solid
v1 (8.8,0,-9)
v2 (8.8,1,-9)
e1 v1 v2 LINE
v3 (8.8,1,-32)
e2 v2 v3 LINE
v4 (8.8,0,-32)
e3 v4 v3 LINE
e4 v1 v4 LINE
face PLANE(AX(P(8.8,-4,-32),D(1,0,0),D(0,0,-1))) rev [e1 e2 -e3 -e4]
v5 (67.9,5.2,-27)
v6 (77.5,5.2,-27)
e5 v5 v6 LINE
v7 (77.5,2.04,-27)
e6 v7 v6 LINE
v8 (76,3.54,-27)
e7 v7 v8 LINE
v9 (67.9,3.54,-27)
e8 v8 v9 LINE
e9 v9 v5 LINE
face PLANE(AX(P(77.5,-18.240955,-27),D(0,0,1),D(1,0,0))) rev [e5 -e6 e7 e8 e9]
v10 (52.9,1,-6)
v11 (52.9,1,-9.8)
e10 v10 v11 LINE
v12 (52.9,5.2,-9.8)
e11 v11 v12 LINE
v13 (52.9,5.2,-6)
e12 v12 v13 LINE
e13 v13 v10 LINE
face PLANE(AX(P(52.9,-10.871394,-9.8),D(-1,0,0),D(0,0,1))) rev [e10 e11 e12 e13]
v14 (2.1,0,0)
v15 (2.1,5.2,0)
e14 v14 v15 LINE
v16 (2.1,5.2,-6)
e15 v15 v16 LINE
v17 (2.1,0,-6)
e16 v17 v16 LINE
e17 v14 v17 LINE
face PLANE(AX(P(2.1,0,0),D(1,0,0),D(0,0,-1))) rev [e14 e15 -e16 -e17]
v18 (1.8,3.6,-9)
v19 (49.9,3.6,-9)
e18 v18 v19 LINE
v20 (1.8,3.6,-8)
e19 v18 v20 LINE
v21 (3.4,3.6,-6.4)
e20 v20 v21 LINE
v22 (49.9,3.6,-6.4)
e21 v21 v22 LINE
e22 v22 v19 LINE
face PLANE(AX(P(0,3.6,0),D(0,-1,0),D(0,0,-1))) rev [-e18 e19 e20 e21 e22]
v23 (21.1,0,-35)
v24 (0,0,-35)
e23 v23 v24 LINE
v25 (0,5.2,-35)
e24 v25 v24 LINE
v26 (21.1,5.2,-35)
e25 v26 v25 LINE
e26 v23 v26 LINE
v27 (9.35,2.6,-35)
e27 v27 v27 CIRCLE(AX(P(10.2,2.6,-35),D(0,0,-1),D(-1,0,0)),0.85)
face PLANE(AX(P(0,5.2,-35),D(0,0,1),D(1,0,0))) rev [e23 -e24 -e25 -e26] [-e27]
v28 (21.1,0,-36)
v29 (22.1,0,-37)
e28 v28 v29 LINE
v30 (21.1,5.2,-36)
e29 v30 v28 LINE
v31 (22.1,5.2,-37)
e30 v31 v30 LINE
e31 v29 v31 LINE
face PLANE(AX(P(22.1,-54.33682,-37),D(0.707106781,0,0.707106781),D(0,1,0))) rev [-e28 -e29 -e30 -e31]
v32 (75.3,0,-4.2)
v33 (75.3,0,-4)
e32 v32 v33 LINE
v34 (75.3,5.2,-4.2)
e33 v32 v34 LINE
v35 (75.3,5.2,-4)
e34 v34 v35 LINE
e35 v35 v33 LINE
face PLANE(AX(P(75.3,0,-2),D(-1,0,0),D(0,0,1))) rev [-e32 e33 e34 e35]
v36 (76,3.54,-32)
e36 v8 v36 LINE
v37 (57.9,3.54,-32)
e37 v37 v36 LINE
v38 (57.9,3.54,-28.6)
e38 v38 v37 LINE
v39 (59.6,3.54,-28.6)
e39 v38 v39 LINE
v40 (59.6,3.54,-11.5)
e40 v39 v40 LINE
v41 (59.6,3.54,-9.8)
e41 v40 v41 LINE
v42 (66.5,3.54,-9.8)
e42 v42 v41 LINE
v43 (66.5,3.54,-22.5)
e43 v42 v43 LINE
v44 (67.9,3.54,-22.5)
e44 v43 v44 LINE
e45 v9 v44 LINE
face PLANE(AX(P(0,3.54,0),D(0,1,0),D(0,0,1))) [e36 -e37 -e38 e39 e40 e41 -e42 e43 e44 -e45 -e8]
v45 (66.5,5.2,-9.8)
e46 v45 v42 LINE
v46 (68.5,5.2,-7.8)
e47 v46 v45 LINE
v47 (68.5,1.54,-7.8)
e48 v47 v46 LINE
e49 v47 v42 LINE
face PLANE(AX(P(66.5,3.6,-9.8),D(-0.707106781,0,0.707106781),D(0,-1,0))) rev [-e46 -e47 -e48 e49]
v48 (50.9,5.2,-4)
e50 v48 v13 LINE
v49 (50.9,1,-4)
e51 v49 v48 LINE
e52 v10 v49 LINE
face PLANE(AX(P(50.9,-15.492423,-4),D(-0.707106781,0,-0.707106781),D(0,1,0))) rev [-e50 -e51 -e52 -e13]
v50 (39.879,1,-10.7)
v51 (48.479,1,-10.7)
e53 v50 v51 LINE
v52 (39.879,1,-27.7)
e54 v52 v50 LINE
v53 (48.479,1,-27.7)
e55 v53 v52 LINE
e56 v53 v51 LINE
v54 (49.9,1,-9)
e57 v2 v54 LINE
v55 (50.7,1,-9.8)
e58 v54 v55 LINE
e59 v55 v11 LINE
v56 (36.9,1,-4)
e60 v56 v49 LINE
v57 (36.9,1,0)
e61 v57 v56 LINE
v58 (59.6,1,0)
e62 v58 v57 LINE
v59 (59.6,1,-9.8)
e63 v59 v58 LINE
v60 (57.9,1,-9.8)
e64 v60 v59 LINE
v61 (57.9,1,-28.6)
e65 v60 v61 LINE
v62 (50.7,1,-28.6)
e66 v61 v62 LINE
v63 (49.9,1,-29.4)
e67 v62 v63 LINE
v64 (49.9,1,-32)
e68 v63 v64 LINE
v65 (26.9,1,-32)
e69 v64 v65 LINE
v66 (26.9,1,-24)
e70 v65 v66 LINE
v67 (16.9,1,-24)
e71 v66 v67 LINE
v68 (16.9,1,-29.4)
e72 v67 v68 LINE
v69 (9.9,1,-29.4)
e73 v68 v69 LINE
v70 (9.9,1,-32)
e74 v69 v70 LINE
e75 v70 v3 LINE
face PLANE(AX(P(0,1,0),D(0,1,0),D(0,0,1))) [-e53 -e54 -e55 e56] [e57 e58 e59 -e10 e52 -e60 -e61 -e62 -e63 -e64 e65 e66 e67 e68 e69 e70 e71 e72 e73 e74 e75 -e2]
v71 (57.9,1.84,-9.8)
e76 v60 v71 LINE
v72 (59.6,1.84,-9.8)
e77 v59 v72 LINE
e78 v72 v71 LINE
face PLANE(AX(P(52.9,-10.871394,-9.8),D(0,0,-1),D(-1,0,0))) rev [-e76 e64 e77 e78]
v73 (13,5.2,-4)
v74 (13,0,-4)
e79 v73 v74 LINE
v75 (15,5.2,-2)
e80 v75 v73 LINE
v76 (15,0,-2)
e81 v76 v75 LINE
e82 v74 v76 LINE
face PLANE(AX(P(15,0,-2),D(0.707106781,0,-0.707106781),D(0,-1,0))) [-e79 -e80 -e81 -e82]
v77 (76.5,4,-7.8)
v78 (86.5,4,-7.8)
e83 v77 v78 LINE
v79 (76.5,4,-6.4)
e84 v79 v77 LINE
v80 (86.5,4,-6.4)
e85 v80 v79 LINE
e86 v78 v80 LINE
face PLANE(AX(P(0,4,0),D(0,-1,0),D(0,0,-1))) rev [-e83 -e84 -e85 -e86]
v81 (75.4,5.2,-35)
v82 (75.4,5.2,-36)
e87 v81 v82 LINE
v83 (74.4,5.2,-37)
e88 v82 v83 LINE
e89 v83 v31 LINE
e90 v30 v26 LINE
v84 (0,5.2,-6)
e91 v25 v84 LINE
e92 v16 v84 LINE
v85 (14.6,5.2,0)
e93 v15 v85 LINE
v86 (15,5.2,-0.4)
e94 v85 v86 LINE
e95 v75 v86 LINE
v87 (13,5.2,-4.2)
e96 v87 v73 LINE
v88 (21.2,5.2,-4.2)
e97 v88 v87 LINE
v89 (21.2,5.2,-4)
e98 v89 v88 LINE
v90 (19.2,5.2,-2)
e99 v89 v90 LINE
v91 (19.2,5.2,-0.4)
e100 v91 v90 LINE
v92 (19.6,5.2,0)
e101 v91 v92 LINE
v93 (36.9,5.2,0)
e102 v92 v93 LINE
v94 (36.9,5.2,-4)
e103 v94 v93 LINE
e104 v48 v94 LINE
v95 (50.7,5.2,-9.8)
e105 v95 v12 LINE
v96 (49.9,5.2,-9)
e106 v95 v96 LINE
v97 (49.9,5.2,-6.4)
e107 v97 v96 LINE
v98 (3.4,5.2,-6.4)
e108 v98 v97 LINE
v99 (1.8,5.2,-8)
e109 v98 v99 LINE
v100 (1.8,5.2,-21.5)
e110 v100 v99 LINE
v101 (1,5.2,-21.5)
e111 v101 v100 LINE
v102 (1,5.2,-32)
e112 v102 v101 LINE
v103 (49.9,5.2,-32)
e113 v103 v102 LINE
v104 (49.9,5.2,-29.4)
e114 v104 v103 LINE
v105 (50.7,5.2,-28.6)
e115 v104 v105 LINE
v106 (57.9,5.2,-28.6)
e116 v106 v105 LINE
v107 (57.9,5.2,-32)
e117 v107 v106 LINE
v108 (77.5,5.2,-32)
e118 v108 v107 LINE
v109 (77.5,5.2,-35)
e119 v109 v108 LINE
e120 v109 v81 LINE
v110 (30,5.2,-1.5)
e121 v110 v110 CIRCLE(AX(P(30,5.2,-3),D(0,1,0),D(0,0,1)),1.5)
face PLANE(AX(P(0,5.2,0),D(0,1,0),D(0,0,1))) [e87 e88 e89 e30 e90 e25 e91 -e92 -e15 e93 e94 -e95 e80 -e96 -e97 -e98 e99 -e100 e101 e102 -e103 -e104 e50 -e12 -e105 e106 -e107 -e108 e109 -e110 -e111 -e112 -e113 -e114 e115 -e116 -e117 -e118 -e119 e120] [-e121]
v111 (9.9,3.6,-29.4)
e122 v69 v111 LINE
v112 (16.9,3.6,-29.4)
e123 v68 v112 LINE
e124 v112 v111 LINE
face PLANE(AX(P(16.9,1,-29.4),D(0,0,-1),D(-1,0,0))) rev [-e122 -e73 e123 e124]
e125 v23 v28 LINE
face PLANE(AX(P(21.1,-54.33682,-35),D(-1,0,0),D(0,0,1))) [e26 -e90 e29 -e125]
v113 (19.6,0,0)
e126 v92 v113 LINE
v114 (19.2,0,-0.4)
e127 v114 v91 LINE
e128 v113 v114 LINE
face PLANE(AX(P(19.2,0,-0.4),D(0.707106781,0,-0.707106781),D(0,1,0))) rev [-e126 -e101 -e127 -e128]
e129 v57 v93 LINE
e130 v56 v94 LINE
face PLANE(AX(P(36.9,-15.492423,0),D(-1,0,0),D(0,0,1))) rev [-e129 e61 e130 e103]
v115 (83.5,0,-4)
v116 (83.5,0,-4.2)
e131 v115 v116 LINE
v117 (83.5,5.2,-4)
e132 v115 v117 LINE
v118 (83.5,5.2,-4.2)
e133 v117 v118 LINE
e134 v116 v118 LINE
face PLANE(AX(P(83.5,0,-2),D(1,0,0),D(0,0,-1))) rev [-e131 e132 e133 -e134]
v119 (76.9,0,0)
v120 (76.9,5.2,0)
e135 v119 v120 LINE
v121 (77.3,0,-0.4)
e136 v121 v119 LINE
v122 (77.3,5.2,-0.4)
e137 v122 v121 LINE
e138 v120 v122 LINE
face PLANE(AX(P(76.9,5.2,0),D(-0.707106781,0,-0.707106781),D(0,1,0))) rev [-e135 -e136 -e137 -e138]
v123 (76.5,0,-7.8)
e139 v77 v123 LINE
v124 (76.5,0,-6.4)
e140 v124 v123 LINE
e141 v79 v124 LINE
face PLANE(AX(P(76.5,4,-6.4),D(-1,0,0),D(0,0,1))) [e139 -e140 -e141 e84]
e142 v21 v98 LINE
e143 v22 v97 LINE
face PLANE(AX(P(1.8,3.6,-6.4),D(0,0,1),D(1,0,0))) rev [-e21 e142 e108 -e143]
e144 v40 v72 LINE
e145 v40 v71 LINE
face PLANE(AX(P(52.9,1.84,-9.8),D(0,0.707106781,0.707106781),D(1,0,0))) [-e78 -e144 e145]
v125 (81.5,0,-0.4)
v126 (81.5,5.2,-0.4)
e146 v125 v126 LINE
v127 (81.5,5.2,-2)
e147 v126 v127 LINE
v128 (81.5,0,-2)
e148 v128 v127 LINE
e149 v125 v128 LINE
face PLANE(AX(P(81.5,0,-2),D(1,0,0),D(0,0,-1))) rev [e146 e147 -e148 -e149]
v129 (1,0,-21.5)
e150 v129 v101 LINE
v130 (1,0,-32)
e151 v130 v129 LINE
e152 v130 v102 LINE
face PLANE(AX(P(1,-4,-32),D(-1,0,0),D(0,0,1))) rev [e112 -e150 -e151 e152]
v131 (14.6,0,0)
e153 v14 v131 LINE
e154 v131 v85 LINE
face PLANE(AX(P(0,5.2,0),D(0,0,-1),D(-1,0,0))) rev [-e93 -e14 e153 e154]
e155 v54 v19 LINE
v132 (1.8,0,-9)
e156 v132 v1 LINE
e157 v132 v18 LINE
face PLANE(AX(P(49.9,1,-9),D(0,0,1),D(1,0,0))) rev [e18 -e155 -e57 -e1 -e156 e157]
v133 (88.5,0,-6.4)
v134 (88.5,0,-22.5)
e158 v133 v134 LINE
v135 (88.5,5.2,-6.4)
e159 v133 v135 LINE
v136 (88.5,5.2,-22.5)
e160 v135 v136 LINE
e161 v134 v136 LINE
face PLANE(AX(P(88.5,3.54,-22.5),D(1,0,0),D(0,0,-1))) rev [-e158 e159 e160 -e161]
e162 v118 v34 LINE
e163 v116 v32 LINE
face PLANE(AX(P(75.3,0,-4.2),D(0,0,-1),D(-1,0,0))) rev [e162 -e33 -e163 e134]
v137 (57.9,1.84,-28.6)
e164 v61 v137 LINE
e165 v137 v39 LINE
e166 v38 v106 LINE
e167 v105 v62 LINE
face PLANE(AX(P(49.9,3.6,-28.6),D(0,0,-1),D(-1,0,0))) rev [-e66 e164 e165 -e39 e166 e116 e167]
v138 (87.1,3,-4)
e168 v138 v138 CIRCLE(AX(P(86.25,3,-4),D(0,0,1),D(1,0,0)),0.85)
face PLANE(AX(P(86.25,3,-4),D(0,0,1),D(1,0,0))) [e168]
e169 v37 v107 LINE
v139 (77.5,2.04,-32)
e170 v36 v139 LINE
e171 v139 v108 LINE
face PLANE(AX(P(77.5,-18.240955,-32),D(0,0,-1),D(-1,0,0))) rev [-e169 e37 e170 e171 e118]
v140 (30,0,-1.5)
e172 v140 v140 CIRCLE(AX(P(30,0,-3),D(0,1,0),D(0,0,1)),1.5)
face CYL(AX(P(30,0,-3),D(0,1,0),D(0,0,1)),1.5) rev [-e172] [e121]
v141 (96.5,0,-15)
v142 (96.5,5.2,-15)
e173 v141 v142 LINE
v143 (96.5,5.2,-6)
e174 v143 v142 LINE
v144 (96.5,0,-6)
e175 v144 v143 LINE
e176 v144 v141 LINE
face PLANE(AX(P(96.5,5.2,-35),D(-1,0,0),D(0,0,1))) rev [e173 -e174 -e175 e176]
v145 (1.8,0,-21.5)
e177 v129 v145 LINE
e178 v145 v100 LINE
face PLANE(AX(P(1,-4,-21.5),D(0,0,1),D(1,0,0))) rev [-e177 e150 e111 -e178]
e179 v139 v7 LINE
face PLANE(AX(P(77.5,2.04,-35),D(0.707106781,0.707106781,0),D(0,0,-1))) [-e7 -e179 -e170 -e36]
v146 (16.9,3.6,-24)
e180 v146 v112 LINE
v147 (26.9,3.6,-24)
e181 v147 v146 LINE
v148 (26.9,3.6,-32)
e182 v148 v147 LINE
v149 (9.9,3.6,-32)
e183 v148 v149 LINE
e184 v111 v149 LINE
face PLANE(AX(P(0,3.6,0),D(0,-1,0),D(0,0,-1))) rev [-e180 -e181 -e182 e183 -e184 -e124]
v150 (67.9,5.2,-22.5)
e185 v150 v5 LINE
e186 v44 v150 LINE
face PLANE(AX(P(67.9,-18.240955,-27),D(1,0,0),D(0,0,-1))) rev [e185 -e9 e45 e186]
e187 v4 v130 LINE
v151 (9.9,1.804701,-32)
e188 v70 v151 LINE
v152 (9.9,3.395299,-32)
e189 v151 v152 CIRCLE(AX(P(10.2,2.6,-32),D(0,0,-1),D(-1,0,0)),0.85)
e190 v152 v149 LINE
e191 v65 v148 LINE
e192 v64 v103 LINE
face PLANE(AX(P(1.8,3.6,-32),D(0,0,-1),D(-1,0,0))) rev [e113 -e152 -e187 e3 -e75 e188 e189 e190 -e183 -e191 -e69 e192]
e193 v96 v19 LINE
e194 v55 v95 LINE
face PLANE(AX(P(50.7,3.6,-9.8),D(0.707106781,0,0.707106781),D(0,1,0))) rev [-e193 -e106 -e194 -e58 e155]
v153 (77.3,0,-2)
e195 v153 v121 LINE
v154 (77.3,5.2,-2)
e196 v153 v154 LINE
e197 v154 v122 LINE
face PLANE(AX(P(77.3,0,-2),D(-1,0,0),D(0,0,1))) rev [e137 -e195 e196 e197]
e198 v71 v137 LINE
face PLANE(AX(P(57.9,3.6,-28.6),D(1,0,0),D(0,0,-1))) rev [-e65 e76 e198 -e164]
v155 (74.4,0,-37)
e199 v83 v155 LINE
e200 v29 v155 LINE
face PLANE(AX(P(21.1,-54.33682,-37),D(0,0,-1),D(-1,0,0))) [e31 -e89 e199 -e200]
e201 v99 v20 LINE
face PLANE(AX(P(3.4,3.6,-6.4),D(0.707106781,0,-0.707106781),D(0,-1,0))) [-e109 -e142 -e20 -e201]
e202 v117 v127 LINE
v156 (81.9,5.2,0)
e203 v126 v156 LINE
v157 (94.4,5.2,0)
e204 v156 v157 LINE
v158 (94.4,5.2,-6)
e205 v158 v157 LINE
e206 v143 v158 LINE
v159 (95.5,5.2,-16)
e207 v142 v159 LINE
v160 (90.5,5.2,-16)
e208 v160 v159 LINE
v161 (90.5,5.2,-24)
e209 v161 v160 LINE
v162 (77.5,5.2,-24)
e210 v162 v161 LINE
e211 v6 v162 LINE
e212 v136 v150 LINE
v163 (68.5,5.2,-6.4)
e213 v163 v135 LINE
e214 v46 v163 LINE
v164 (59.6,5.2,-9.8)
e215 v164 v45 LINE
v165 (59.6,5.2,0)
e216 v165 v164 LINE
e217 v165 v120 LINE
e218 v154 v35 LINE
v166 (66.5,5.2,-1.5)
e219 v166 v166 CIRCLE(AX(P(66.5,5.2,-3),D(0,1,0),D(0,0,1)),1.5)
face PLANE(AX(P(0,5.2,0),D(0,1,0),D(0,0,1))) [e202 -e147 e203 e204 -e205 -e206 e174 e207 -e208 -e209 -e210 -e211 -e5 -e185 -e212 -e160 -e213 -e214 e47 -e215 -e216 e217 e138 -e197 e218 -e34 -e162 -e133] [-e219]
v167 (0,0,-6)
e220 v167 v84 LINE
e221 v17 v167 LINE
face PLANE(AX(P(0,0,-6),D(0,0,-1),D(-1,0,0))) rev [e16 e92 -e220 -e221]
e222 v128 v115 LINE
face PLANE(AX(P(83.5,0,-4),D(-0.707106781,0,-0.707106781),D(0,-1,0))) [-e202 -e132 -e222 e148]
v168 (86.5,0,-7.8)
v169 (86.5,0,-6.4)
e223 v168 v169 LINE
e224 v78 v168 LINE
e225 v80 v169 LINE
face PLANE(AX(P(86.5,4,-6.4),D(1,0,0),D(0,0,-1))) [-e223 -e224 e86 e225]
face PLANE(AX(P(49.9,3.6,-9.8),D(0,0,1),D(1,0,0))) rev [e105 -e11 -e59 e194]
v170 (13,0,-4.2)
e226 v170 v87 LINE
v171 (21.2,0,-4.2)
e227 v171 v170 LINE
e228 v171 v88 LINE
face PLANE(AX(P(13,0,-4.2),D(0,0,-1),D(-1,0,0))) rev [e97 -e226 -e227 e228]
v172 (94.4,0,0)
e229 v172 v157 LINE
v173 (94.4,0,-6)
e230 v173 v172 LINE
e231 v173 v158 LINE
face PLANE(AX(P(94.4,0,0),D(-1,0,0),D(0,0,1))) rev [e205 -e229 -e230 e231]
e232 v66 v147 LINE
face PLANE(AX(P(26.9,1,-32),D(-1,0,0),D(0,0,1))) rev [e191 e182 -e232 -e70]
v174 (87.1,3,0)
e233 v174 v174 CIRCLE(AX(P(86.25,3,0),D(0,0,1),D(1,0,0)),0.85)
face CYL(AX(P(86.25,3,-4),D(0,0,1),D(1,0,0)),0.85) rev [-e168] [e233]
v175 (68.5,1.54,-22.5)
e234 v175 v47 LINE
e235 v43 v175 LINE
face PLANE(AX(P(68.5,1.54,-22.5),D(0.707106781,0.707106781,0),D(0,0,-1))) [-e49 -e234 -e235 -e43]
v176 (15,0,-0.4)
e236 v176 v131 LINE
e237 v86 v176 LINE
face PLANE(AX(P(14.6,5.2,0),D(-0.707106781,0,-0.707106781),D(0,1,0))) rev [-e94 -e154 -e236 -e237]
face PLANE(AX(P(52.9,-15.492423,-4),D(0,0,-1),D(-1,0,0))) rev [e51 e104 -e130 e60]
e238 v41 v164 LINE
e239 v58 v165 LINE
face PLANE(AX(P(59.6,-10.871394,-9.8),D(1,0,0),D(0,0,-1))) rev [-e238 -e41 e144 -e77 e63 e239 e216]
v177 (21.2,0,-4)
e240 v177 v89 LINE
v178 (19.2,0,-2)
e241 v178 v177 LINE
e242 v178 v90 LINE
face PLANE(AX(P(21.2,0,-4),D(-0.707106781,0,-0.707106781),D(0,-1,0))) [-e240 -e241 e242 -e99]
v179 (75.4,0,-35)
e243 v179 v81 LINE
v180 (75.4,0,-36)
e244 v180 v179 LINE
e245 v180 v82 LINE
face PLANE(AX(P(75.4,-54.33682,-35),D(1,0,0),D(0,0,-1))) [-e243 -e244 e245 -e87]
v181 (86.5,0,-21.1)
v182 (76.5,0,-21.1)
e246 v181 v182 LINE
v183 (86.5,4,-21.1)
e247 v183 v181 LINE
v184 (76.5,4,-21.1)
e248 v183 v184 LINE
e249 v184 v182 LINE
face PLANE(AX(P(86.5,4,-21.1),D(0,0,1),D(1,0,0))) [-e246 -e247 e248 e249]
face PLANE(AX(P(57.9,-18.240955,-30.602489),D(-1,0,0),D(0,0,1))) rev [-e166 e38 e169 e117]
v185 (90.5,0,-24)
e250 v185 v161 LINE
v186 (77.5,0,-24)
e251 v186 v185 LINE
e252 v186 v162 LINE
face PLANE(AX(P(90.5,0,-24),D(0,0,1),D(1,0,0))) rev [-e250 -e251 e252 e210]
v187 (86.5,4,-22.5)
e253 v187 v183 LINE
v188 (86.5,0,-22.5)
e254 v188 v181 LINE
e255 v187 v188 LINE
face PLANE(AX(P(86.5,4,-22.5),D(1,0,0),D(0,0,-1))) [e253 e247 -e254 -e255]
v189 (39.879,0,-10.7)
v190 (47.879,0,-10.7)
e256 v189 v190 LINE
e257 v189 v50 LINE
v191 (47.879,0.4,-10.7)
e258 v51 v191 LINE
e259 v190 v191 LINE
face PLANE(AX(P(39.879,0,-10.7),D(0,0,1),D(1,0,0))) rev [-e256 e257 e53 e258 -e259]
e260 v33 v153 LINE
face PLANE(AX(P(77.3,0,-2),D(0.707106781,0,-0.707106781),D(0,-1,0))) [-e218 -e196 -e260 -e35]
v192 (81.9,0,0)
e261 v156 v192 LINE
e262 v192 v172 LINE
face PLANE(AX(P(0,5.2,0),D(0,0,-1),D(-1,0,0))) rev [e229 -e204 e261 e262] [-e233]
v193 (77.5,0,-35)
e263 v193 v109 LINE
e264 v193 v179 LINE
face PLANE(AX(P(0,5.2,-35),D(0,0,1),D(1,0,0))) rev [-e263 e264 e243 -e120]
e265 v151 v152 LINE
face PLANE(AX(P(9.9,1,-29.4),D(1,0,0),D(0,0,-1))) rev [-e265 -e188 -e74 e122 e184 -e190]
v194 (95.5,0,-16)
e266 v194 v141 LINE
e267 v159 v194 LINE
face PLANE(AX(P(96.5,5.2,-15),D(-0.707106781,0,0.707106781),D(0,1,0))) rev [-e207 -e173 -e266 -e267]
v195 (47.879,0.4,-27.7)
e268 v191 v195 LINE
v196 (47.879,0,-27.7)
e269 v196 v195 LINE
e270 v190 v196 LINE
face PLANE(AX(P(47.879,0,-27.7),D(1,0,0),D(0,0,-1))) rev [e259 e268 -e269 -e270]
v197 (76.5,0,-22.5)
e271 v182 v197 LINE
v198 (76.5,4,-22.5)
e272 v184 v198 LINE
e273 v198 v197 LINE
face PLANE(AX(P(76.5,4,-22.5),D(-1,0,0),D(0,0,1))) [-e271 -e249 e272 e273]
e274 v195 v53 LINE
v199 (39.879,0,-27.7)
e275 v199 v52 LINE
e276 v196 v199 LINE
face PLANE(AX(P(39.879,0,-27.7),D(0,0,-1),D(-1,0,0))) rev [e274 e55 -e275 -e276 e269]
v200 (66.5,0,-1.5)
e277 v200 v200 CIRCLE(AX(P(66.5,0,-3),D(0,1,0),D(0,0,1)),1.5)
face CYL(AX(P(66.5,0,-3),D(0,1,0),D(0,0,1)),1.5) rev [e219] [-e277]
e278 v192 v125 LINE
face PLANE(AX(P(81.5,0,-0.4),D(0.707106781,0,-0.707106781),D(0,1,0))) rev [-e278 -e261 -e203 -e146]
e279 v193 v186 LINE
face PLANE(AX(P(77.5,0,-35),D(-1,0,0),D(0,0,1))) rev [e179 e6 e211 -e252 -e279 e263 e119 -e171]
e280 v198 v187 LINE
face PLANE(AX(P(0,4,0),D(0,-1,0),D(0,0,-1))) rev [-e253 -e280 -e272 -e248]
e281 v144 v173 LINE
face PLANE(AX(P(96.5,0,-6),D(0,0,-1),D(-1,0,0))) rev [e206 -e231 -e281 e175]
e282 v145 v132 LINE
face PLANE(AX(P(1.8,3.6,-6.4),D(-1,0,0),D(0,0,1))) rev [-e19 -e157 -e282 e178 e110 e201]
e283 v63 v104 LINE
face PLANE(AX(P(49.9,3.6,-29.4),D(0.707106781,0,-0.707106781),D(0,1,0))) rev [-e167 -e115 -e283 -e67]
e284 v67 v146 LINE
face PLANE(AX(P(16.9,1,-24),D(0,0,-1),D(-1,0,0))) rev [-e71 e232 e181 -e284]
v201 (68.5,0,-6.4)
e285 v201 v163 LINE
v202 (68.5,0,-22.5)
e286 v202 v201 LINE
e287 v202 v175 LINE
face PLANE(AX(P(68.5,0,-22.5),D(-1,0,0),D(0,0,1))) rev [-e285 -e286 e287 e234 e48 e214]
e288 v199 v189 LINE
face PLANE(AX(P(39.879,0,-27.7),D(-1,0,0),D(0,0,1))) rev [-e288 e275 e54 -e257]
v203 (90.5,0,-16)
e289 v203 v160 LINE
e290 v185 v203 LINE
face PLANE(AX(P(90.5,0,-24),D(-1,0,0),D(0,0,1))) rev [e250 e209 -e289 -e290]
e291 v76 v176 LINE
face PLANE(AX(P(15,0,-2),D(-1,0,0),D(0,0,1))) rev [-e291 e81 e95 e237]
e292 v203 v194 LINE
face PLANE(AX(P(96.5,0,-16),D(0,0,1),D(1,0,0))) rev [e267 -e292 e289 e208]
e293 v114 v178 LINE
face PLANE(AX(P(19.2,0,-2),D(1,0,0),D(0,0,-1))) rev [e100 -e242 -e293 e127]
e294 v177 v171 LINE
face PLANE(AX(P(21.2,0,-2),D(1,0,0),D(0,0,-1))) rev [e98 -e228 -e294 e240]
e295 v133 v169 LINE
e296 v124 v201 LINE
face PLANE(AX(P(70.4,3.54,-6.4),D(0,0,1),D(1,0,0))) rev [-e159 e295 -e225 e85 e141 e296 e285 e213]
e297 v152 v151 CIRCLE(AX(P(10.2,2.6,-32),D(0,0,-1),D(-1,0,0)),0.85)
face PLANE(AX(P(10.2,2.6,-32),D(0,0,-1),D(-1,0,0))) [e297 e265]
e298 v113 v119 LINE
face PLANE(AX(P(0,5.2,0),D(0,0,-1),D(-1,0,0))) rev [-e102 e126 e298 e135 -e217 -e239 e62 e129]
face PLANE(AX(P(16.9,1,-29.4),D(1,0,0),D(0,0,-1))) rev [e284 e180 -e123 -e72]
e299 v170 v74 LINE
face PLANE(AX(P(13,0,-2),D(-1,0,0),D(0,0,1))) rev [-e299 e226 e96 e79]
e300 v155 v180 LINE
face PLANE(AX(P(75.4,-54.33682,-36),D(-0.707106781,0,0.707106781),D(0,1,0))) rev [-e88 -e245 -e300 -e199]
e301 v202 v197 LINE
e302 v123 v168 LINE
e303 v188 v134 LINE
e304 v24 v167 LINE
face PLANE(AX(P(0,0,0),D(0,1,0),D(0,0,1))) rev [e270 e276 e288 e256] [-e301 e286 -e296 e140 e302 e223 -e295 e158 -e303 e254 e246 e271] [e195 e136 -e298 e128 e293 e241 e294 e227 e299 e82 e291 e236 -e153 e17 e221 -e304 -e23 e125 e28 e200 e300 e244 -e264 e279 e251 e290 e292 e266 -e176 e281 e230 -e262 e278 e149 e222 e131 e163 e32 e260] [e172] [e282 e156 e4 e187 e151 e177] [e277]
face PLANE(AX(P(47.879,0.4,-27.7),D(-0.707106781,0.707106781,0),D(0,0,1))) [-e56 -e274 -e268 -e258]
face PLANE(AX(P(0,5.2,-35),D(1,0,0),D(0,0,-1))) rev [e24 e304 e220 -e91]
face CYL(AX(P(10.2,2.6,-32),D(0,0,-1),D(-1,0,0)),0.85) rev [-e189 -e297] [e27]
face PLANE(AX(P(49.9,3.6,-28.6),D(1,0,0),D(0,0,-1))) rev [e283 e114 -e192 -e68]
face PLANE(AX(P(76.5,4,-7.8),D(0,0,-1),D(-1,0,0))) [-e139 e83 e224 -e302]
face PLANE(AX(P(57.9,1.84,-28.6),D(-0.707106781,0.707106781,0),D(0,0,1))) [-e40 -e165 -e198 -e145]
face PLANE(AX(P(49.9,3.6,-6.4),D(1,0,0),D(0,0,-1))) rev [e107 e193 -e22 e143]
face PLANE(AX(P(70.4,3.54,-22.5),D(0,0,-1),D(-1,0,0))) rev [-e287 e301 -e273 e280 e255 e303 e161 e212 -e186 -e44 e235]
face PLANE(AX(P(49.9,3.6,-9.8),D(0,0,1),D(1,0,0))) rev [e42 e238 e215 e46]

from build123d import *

# Parameters (mm, degrees)
SKETCH_1_W           = 96.5
SKETCH_1_H           = 35
EXTRUDE_1_DEPTH      = 5.2
CUT_EXTRUDE_6_DEPTH  = 1.6
CUT_EXTRUDE_7_DEPTH  = 2.6
CUT_EXTRUDE_15_DEPTH = 5
SKETCH_7_W           = 8
SKETCH_7_H           = 17
CUT_EXTRUDE_16_DEPTH = 103.736994311
SKETCH_8_W           = 18.1
SKETCH_8_H           = 16.1
CUT_EXTRUDE_17_DEPTH = 1.66
CUT_EXTRUDE_18_REACH = 104.712
SKETCH_9_W           = 15.2
SKETCH_9_H           = 16.1
CHAMFER_1_SIZE       = 0.6
SKETCH_10_W          = 12.5
SKETCH_10_H          = 12.7
CUT_EXTRUDE_19_DEPTH = 1.66
CHAMFER_2_SIZE       = 0.8
CUT_EXTRUDE_20_DEPTH = 103.782732013
CHAMFER_4_SIZE       = 1
SKETCH_14_W          = 54.3
SKETCH_14_H          = 2
EXTRUDE_2_DEPTH      = 5.2
CHAMFER_5_SIZE       = 1
CUT_EXTRUDE_21_DEPTH = 1.66
CHAMFER_3_SIZE       = 1.5
CHAMFER_6_SIZE       = 1.6
SKETCH_16_W          = 2.1
SKETCH_16_H          = 6
CUT_EXTRUDE_22_DEPTH = 104.480867797
CUT_EXTRUDE_24_DEPTH = 104.480867797
CHAMFER_11_SIZE      = 2
CHAMFER_10_SIZE      = 0.4
CUT_EXTRUDE_START    = -4.2
SKETCH_21_W          = 6.7
SKETCH_21_H          = 9.8
CUT_EXTRUDE_26_DEPTH = 4.2
CHAMFER_9_SIZE       = 1.7
SKETCH_22_W          = 16
SKETCH_22_H          = 4
CUT_EXTRUDE_27_DEPTH = 4.2
CHAMFER_12_SIZE      = 2
SKETCH_24_R          = 1.5
CUT_EXTRUDE_28_DEPTH = 104.480867797
SKETCH_25_R          = 0.85
CUT_EXTRUDE_29_DEPTH = 3
SKETCH_26_R          = 0.85
CUT_EXTRUDE_30_DEPTH = 4
SKETCH_27_W          = 20
SKETCH_27_H          = 16.1
CUT_EXTRUDE_31_DEPTH = 104.480867797
SKETCH_28_W          = 10
SKETCH_28_H          = 1.4
EXTRUDE_3_DEPTH      = 4
CHAMFER_13_SIZE      = 2
CHAMFER_14_SIZE      = 2


# Some blends are built 0.0001 mm under size
with BuildPart() as part:
    # 草图1 → 凸台-拉伸1 (new body)
    with BuildSketch(Plane(origin=(0, 0, 0), x_dir=(1, 0, 0), z_dir=(0, 1, 0))):
        with Locations((48.25, 17.5)):
            Rectangle(SKETCH_1_W, SKETCH_1_H)
    extrude(amount=EXTRUDE_1_DEPTH)

    # 草图4 → 切除-拉伸6 (cut)
    with BuildSketch(Plane(origin=(0, 5.2, 0), x_dir=(1, 0, 0), z_dir=(0, 1, 0))):
        Polygon((1.8, 6.4), (49.9, 6.4), (49.9, 9.8), (57.9, 9.8), (57.9, 28.6), (49.9, 28.6), (49.9, 32), (1.8, 32), align=None)
    extrude(amount=-CUT_EXTRUDE_6_DEPTH, mode=Mode.SUBTRACT)

    # 草图5 → 切除-拉伸7 (cut)
    with BuildSketch(Plane(origin=(0, 3.6, 0), x_dir=(1, 0, 0), z_dir=(0, 1, 0))):
        Polygon((49.9, 9), (1.8, 9), (1.8, 32), (9.9, 32), (9.9, 29.4), (16.9, 29.4), (16.9, 24), (26.9, 24), (26.9, 32), (49.9, 32), (49.9, 28.6), (57.9, 28.6), (57.9, 9.8), (49.9, 9.8), align=None)
    extrude(amount=-CUT_EXTRUDE_7_DEPTH, mode=Mode.SUBTRACT)

    # 草图6 → 切除-拉伸15 (cut, symmetric)
    with BuildSketch(Plane(origin=(0, 1, 0), x_dir=(1, 0, 0), z_dir=(0, 1, 0))):
        Polygon((3.8, 32), (8.8, 32), (8.8, 9), (1.8, 9), (1.8, 21.5), (1, 21.5), (1, 32), align=None)
    extrude(amount=CUT_EXTRUDE_15_DEPTH, both=True, mode=Mode.SUBTRACT)

    # 草图7 → 切除-拉伸16 (cut, through all)
    with BuildSketch(Plane(origin=(0, 1, 0), x_dir=(1, 0, 0), z_dir=(0, 1, 0))):
        with Locations((43.879, 19.2)):
            Rectangle(SKETCH_7_W, SKETCH_7_H)
    extrude(amount=-CUT_EXTRUDE_16_DEPTH, mode=Mode.SUBTRACT)

    # 草图8 → 切除-拉伸17 (cut)
    with BuildSketch(Plane(origin=(0, 5.2, 0), x_dir=(1, 0, 0), z_dir=(0, 1, 0))):
        with Locations((79.45, 14.45)):
            Rectangle(SKETCH_8_W, SKETCH_8_H)
    extrude(amount=-CUT_EXTRUDE_17_DEPTH, mode=Mode.SUBTRACT)

    # 草图9 → 切除-拉伸18 (cut, up to next)
    with BuildSketch(Plane(origin=(0, 3.54, 0), x_dir=(1, 0, 0), z_dir=(0, 1, 0)), mode=Mode.PRIVATE) as cut_extrude_18_sk1:
        with Locations((79.2, 14.45)):
            Rectangle(SKETCH_9_W, SKETCH_9_H)
    cut_extrude_18_tool1 = extrude(cut_extrude_18_sk1.sketch, amount=-CUT_EXTRUDE_18_REACH, mode=Mode.PRIVATE) & part.part
    add(cut_extrude_18_tool1.solids().sort_by_distance((79.2, 3.54, -14.45))[0], mode=Mode.SUBTRACT)

    # 倒角1
    chamfer_1_edges = [part.edges().sort_by_distance(p)[0] for p in [
        (47.879, 1, -19.2),
    ]]
    chamfer(chamfer_1_edges, length=CHAMFER_1_SIZE)

    # 草图10 → 切除-拉伸19 (cut)
    with BuildSketch(Plane(origin=(0, 5.2, 0), x_dir=(1, 0, 0), z_dir=(0, 1, 0))):
        with Locations((64.15, 16.15)):
            Rectangle(SKETCH_10_W, SKETCH_10_H)
    extrude(amount=-CUT_EXTRUDE_19_DEPTH, mode=Mode.SUBTRACT)

    # 倒角2
    chamfer_2_edges = [part.edges().sort_by_distance(p)[0] for p in [
        (49.9, 3.1, -28.6),
        (49.9, 3.1, -9.8),
    ]]
    chamfer(chamfer_2_edges, length=CHAMFER_2_SIZE)

    # 草图12 → 切除-拉伸20 (cut, through all)
    with BuildSketch(Plane(origin=(0, 5.2, 0), x_dir=(1, 0, 0), z_dir=(0, 1, 0))):
        Polygon((96.5, 35), (77.5, 35), (77.5, 24), (90.5, 24), (90.5, 16), (96.5, 16), align=None)
    extrude(amount=-CUT_EXTRUDE_20_DEPTH, mode=Mode.SUBTRACT)

    # 倒角4
    chamfer_4_edges = [part.edges().sort_by_distance(p)[0] for p in [
        (96.5, 2.6, -16),
    ]]
    chamfer(chamfer_4_edges, length=CHAMFER_4_SIZE)

    # 草图14 → 凸台-拉伸2 (add)
    with BuildSketch(Plane(origin=(0, 5.2, 0), x_dir=(1, 0, 0), z_dir=(0, 1, 0))):
        with Locations((48.25, 36)):
            Rectangle(SKETCH_14_W, SKETCH_14_H)
    extrude(amount=-EXTRUDE_2_DEPTH)

    # 倒角5
    chamfer_5_edges = [part.edges().sort_by_distance(p)[0] for p in [
        (21.1, 2.6, -37),
        (75.4, 2.6, -37),
    ]]
    chamfer(chamfer_5_edges, length=CHAMFER_5_SIZE)

    # 草图15 → 切除-拉伸21 (cut)
    with BuildSketch(Plane(origin=(0, 5.2, 0), x_dir=(1, 0, 0), z_dir=(0, 1, 0))):
        Polygon((77.5, 32), (57.9, 32), (57.9, 30.602488817), (57.9, 22.5), (67.9, 22.5), (67.9, 27), (77.5, 27), align=None)
    extrude(amount=-CUT_EXTRUDE_21_DEPTH, mode=Mode.SUBTRACT)

    # 倒角3
    chamfer_3_edges = [part.edges().sort_by_distance(p)[0] for p in [
        (77.5, 3.54, -29.5),
    ]]
    chamfer(chamfer_3_edges, length=CHAMFER_3_SIZE)

    # 倒角6
    chamfer_6_edges = [part.edges().sort_by_distance(p)[0] for p in [
        (1.8, 4.4, -6.4),
    ]]
    chamfer(chamfer_6_edges, length=CHAMFER_6_SIZE)

    # 草图16 → 切除-拉伸22 (cut, through all)
    with BuildSketch(Plane(origin=(0, 5.2, 0), x_dir=(1, 0, 0), z_dir=(0, 1, 0))):
        with Locations((1.05, 3)):
            Rectangle(SKETCH_16_W, SKETCH_16_H)
        with Locations((95.45, 3)):
            Rectangle(SKETCH_16_W, SKETCH_16_H)
    extrude(amount=-CUT_EXTRUDE_22_DEPTH, mode=Mode.SUBTRACT)

    # 草图19 → 切除-拉伸24 (cut, through all)
    with BuildSketch(Plane(origin=(0, 5.2, 0), x_dir=(1, 0, 0), z_dir=(0, 1, 0))):
        Polygon((15, 0), (19.2, 0), (19.2, 2), (21.2, 2), (21.2, 4.2), (13, 4.2), (13, 2), (15, 2), align=None)
        Polygon((77.3, 2), (77.3, 0), (81.5, 0), (81.5, 2), (83.5, 2), (83.5, 4.2), (75.3, 4.2), (75.3, 2), align=None)
    extrude(amount=-CUT_EXTRUDE_24_DEPTH, mode=Mode.SUBTRACT)

    # 倒角11
    chamfer_11_edges = [part.edges().sort_by_distance(p)[0] for p in [
        (83.5, 2.6, -2),
        (75.3, 2.6, -2),
        (21.2, 2.6, -2),
        (13, 2.6, -2),
    ]]
    chamfer(chamfer_11_edges, length=CHAMFER_11_SIZE - 0.0001)  # a hair under: the kernel refuses the full size

    # 倒角10
    chamfer_10_edges = [part.edges().sort_by_distance(p)[0] for p in [
        (19.2, 2.6, 0),
        (15, 2.6, 0),
        (81.5, 2.6, 0),
        (77.3, 2.6, 0),
    ]]
    chamfer(chamfer_10_edges, length=CHAMFER_10_SIZE)

    # 草图21 → 切除-拉伸26 (cut)
    with BuildSketch(Plane(origin=(0, 5.2, 0), x_dir=(1, 0, 0), z_dir=(0, 1, 0)).offset(CUT_EXTRUDE_START)):
        with Locations((56.25, 4.9)):
            Rectangle(SKETCH_21_W, SKETCH_21_H)
    extrude(amount=CUT_EXTRUDE_26_DEPTH, mode=Mode.SUBTRACT)

    # 倒角9
    chamfer_9_edges = [part.edges().sort_by_distance(p)[0] for p in [
        (57.9, 3.54, -19.2),
        (58.75, 3.54, -9.8),
    ]]
    chamfer(chamfer_9_edges, length=CHAMFER_9_SIZE - 0.0001)  # a hair under: the kernel refuses the full size

    # 草图22 → 切除-拉伸27 (cut)
    with BuildSketch(Plane(origin=(0, 5.2, 0), x_dir=(1, 0, 0), z_dir=(0, 1, 0))):
        with Locations((44.9, 2)):
            Rectangle(SKETCH_22_W, SKETCH_22_H)
    extrude(amount=-CUT_EXTRUDE_27_DEPTH, mode=Mode.SUBTRACT)

    # 倒角12
    chamfer_12_edges = [part.edges().sort_by_distance(p)[0] for p in [
        (52.9, 3.1, -4),
    ]]
    chamfer(chamfer_12_edges, length=CHAMFER_12_SIZE)

    # 草图24 → 切除-拉伸28 (cut, through all)
    with BuildSketch(Plane(origin=(0, 5.2, 0), x_dir=(1, 0, 0), z_dir=(0, 1, 0))):
        with Locations(Location((30, 3, 0), (0, 0, 270))):
            Circle(SKETCH_24_R)
        with Locations(Location((66.5, 3, 0), (0, 0, 270))):
            Circle(SKETCH_24_R)
    extrude(amount=-CUT_EXTRUDE_28_DEPTH, mode=Mode.SUBTRACT)

    # 草图25 → 切除-拉伸29 (cut)
    with BuildSketch(Plane(origin=(0, 0, -35), x_dir=(-1, 0, 0), z_dir=(0, 0, -1))):
        with Locations((-10.2, 2.6)):
            Circle(SKETCH_25_R)
    extrude(amount=-CUT_EXTRUDE_29_DEPTH, mode=Mode.SUBTRACT)

    # 草图26 → 切除-拉伸30 (cut)
    with BuildSketch(Plane.XY):
        with Locations((86.25, 3)):
            Circle(SKETCH_26_R)
    extrude(amount=-CUT_EXTRUDE_30_DEPTH, mode=Mode.SUBTRACT)

    # 草图27 → 切除-拉伸31 (cut, through all)
    with BuildSketch(Plane(origin=(0, 5.2, 0), x_dir=(1, 0, 0), z_dir=(0, 1, 0))):
        with Locations((78.5, 14.45)):
            Rectangle(SKETCH_27_W, SKETCH_27_H)
    extrude(amount=-CUT_EXTRUDE_31_DEPTH, mode=Mode.SUBTRACT)

    # 草图28 → 凸台-拉伸3 (add)
    with BuildSketch(Plane.XZ):
        with Locations((81.5, -7.1)):
            Rectangle(SKETCH_28_W, SKETCH_28_H)
        with Locations((81.5, -21.8)):
            Rectangle(SKETCH_28_W, SKETCH_28_H)
    extrude(amount=-EXTRUDE_3_DEPTH)

    # 倒角13
    chamfer_13_edges = [part.edges().sort_by_distance(p)[0] for p in [
        (68.5, 4.37, -9.8),
    ]]
    chamfer(chamfer_13_edges, length=CHAMFER_13_SIZE)

    # 倒角14
    # the kernel refuses this chamfer: 2 mm, written as the material it takes off along each edge
    with BuildSketch(Plane(origin=(68.5, 3.54, -22.5), x_dir=(-0.9996219169112968, 0.027495876610586414, 0), z_dir=(0, 0, 1))) as chamfer_14_piece_1_section:
        Polygon((CHAMFER_14_SIZE * 0.999621916911, CHAMFER_14_SIZE * 0.0274958766106), (-CHAMFER_14_SIZE * 0.0274958766106, CHAMFER_14_SIZE * 0.999621916911), (0, 0), align=None)
    chamfer_14_piece_1 = extrude(amount=19.843365976, mode=Mode.PRIVATE)
    chamfer_14_piece_1 = split(chamfer_14_piece_1, bisect_by=Plane(origin=(63.791666667, 3.073333333, -12.508333333), z_dir=(0.7071067811865476, 0, -0.7071067811865476)), keep=Keep.TOP, mode=Mode.PRIVATE)
    add(chamfer_14_piece_1, mode=Mode.SUBTRACT)


solid = part.part
